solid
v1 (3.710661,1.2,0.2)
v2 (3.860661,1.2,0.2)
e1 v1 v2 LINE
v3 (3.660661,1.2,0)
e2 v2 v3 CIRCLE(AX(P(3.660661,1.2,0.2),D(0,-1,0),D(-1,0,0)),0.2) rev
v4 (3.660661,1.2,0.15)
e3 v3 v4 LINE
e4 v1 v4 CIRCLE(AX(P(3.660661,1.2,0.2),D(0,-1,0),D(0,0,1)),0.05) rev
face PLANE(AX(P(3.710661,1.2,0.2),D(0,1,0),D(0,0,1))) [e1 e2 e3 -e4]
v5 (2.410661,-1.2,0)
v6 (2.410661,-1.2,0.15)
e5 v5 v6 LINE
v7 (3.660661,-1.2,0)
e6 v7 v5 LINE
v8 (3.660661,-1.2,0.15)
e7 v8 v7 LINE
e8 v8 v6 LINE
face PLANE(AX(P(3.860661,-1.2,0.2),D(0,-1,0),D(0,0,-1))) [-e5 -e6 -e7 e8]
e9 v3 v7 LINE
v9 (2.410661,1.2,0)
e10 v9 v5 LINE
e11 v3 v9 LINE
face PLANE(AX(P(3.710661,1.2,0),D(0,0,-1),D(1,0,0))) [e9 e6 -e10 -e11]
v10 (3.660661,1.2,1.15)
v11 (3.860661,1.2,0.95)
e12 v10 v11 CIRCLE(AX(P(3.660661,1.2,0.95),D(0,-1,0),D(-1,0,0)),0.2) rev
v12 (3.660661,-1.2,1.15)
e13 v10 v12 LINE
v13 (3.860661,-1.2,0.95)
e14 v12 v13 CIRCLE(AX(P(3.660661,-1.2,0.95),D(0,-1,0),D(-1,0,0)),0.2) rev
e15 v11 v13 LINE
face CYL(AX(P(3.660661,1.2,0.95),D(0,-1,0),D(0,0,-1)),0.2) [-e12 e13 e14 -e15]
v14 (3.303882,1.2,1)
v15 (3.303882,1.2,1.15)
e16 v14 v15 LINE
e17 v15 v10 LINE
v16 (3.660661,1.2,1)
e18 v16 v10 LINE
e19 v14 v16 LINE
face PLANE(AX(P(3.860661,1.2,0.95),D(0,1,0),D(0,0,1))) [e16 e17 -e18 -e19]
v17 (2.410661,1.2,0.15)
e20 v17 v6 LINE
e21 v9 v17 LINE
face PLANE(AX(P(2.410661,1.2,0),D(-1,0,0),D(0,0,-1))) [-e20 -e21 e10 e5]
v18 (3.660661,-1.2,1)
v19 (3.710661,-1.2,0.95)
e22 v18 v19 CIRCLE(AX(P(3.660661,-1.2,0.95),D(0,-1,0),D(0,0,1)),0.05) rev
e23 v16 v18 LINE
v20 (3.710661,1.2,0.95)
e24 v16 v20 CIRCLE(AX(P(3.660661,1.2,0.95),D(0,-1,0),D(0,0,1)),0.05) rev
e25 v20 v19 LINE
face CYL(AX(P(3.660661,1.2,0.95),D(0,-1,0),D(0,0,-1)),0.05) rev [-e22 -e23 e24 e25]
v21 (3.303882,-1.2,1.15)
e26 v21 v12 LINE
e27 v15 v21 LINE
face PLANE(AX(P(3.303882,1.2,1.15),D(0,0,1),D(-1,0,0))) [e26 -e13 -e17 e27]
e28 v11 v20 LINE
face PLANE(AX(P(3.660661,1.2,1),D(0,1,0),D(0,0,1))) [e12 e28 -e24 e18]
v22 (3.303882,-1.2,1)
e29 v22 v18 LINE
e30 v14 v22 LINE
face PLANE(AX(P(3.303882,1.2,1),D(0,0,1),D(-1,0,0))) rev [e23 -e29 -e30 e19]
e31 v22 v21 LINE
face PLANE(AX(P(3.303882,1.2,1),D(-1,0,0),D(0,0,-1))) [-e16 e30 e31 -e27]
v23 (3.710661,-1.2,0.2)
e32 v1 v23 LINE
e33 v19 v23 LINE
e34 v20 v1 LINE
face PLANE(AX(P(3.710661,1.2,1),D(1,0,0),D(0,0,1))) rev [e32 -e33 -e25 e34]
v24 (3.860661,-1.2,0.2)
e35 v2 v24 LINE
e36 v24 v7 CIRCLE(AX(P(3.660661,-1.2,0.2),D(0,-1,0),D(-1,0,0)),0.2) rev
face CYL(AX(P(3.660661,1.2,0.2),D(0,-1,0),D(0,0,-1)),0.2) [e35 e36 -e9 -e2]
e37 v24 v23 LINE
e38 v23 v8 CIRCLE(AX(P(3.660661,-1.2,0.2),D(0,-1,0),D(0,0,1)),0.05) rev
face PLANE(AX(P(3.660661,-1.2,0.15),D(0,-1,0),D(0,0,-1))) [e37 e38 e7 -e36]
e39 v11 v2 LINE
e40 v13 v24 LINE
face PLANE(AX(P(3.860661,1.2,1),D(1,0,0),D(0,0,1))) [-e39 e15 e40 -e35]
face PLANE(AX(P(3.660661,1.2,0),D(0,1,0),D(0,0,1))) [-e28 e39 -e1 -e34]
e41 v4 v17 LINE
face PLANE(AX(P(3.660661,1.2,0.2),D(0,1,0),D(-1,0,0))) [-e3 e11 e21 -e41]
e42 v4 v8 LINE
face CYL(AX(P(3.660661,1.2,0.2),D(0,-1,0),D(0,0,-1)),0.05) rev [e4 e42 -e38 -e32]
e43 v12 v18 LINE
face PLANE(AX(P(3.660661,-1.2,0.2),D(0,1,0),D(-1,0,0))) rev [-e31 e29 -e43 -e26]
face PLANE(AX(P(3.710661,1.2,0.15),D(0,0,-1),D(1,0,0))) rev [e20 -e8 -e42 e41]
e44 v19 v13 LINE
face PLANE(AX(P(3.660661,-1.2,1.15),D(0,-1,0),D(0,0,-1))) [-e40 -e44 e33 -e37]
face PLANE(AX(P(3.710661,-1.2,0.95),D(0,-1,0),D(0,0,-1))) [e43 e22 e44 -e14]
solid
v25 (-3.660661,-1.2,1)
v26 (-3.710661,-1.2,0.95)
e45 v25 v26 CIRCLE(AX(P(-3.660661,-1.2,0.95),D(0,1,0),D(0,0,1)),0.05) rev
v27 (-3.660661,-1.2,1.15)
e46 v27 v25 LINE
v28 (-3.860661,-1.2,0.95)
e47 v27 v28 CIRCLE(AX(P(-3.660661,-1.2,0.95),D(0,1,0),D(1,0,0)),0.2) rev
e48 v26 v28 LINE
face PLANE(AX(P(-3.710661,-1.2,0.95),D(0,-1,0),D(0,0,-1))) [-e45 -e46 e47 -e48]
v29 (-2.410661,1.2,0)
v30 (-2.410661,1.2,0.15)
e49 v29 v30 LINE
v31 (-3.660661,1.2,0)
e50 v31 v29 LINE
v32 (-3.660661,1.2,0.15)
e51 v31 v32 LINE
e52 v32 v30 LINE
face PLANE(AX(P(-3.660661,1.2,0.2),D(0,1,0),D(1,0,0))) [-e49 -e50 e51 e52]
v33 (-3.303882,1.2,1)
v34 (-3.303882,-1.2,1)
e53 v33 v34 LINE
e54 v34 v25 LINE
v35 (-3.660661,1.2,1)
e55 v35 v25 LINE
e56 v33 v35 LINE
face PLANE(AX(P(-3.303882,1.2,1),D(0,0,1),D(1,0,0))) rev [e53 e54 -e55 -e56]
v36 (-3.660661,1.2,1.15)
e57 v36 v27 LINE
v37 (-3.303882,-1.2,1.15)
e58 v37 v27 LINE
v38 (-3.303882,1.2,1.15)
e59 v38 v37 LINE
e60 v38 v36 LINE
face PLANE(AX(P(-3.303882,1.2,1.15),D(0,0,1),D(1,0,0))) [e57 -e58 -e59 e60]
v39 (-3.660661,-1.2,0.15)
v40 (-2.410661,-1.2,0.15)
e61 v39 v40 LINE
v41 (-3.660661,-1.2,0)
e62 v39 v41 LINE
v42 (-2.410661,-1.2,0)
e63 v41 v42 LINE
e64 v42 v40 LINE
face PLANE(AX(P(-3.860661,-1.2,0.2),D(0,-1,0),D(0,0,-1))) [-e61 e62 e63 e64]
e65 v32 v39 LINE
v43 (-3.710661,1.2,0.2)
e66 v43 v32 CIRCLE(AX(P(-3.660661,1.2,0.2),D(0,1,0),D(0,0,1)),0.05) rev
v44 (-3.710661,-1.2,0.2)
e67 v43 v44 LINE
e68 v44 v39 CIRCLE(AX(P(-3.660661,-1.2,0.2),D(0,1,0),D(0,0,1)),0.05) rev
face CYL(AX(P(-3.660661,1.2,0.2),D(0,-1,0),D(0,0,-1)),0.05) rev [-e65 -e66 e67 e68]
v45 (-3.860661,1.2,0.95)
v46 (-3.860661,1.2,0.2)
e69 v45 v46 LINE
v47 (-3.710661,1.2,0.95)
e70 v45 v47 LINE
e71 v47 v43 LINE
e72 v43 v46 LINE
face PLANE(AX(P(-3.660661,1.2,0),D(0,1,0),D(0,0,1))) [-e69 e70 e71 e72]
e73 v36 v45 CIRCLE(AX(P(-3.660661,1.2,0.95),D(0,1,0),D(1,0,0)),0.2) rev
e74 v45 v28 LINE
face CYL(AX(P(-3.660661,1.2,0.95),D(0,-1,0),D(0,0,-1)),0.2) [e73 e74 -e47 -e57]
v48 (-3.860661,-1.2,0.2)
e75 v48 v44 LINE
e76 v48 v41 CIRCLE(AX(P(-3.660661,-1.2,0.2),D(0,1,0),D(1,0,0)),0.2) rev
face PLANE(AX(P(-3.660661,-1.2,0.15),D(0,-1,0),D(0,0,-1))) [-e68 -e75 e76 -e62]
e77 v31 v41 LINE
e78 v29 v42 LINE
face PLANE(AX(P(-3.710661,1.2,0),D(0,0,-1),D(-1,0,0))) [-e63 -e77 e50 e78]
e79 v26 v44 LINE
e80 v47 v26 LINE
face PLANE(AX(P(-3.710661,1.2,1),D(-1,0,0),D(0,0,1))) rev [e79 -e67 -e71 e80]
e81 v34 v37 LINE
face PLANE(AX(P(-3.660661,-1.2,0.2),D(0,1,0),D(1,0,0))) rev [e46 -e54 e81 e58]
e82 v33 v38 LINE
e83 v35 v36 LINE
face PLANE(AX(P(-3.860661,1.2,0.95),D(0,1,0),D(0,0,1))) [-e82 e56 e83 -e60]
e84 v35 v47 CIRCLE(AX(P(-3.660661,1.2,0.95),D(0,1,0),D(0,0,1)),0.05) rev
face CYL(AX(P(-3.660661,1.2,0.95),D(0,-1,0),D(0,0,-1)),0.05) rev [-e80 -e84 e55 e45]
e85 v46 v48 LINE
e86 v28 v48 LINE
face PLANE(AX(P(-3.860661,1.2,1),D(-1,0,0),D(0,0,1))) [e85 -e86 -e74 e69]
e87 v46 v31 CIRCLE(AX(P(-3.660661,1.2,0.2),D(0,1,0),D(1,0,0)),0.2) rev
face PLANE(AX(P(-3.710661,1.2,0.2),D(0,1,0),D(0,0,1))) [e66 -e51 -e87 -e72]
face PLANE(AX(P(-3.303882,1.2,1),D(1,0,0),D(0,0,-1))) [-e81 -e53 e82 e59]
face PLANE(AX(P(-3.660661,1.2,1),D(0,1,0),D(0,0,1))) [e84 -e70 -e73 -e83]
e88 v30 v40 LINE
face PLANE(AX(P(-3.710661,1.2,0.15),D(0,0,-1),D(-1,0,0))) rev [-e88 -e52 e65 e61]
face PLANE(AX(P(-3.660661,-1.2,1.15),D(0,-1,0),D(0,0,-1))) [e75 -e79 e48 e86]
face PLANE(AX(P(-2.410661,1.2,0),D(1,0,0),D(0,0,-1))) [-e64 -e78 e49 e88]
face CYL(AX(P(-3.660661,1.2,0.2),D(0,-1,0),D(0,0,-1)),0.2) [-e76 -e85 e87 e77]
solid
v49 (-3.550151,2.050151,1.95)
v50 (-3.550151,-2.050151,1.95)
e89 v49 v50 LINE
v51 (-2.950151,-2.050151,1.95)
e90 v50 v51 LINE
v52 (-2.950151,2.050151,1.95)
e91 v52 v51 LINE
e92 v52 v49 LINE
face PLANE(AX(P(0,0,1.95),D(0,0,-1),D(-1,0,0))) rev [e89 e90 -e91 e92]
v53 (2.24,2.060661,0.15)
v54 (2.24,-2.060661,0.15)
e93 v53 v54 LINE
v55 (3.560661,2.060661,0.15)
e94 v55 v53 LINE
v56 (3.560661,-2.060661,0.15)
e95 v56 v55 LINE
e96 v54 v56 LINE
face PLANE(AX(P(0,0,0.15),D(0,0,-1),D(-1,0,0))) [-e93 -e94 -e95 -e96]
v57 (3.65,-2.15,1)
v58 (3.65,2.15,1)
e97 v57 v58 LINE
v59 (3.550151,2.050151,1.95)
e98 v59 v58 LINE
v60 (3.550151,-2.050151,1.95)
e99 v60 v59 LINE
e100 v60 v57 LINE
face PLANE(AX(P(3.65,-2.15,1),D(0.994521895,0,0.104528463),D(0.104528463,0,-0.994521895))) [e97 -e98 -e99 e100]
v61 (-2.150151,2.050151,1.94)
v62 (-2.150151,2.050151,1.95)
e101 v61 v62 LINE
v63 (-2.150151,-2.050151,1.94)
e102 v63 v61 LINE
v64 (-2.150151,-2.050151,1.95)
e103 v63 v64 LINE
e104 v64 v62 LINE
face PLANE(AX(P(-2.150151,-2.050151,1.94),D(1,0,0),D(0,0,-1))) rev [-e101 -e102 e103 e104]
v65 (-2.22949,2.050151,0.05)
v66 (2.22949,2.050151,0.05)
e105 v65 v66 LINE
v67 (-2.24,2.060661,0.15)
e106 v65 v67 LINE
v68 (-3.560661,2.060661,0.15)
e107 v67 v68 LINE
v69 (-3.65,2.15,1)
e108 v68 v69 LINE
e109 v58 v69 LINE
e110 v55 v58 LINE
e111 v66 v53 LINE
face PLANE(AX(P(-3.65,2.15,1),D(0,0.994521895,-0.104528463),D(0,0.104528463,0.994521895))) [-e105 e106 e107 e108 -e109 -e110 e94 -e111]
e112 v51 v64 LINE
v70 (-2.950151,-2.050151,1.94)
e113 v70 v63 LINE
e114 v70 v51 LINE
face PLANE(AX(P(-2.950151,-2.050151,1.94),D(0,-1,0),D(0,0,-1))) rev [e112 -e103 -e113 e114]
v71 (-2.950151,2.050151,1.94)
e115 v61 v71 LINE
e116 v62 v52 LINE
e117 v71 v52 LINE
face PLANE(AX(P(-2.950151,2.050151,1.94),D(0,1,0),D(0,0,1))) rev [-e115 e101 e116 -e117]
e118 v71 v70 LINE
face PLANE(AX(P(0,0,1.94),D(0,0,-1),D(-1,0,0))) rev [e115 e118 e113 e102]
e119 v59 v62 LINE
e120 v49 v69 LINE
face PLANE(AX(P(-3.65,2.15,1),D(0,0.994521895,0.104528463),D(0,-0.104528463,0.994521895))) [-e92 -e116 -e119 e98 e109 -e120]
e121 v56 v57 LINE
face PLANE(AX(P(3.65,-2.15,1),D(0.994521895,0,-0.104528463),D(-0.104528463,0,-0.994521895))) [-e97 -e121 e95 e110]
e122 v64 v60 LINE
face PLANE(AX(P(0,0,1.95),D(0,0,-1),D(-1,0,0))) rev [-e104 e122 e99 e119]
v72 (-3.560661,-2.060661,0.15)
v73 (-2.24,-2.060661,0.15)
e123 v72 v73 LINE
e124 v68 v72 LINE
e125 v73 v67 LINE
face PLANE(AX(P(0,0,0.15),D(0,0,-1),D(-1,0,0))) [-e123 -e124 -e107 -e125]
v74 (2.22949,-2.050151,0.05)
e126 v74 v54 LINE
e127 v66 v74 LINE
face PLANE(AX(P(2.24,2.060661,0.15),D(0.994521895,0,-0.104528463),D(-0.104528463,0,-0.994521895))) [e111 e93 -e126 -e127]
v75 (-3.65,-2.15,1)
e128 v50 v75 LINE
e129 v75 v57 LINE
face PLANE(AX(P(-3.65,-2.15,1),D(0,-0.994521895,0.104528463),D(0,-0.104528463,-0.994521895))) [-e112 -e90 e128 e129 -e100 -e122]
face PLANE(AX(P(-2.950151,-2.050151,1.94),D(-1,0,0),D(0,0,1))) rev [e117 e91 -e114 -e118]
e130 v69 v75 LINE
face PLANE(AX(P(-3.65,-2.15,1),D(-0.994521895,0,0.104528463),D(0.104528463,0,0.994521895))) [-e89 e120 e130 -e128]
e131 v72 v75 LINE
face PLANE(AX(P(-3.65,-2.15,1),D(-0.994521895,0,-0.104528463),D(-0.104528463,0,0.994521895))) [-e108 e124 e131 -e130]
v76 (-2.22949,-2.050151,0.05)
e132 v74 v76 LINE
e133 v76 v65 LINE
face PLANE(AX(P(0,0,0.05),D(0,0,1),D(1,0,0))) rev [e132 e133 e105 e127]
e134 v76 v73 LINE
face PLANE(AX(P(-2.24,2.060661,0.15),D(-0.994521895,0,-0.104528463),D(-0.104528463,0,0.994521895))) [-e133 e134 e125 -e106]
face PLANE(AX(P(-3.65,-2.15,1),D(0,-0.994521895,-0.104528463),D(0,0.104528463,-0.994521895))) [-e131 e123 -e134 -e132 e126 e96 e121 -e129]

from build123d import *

# Parameters (mm, degrees)
SKETCH_1_W                  = 7.3
SKETCH_1_H                  = 4.3
EXTRUDE_1_DEPTH             = 0.95
EXTRUDE_1_TAPER             = 6
EXTRUDE_1_OTHER_WAY_DEPTH   = 0.85
EXTRUDE_1_OTHER_WAY_TAPER   = 6
SM_BASE_FLANGE_1_DEPTH      = 1.2
SM_BASE_FLANGE_1_DEPTH_BACK = 1.2
SKETCH_10_W                 = 4.48
SKETCH_10_H                 = 4.1213228
EXTRUDE_2_DEPTH             = 0.1
EXTRUDE_2_TAPER             = 6
SKETCH_12_W                 = 0.8
SKETCH_12_H                 = 4.100301952
CUT_EXTRUDE_1_DEPTH         = 0.01


# Sheet-metal steps are written as plain solids
with BuildPart() as part:
    # Sketch 1 → Бобышка-Вытянуть1 (new body)
    with BuildSketch(Plane.XY.offset(1)):
        Rectangle(SKETCH_1_W, SKETCH_1_H)
    extrude(amount=EXTRUDE_1_DEPTH, taper=EXTRUDE_1_TAPER)

    # Sketch 1 → Бобышка-Вытянуть1 other way (add)
    with BuildSketch(Plane.XY.offset(1)):
        Rectangle(SKETCH_1_W, SKETCH_1_H)
    extrude(amount=-EXTRUDE_1_OTHER_WAY_DEPTH, taper=EXTRUDE_1_OTHER_WAY_TAPER)

    # Эскиз10 → Бобышка-Вытянуть2 (add)
    with BuildSketch(Plane(origin=(0, 0, 0.15), x_dir=(-1, 0, 0), z_dir=(0, 0, -1))):
        Rectangle(SKETCH_10_W, SKETCH_10_H)
    extrude(amount=EXTRUDE_2_DEPTH, taper=EXTRUDE_2_TAPER)

    # Эскиз12 → Вырез-Вытянуть1 (cut)
    with BuildSketch(Plane.XY.offset(1.95)):
        with Locations((-2.550150976, 0)):
            Rectangle(SKETCH_12_W, SKETCH_12_H)
    extrude(amount=-CUT_EXTRUDE_1_DEPTH, mode=Mode.SUBTRACT)


with BuildPart() as body_2:
    # Sketch 3 → Базовая кромка1 (new, two sides: drawn at the far end of the back side and taken through both)
    with BuildSketch(Plane(origin=(0, 0, 0), x_dir=(1, 0, 0), z_dir=(0, 1, 0)).offset(-SM_BASE_FLANGE_1_DEPTH_BACK)):
        with BuildLine():
            Line((-3.303882397, -1), (-3.6606614, -1))
            ThreePointArc((-3.6606614, -1), (-3.696016739, -0.985355339), (-3.7106614, -0.95))
            Line((-3.7106614, -0.95), (-3.7106614, -0.2))
            ThreePointArc((-3.7106614, -0.2), (-3.696016739, -0.164644661), (-3.6606614, -0.15))
            Line((-3.6606614, -0.15), (-2.4106614, -0.15))
            Line((-2.4106614, -0.15), (-2.4106614, 0))
            Line((-2.4106614, 0), (-3.6606614, 0))
            ThreePointArc((-3.6606614, 0), (-3.802082756, -0.058578644), (-3.8606614, -0.2))
            Line((-3.8606614, -0.2), (-3.8606614, -0.95))
            ThreePointArc((-3.8606614, -0.95), (-3.802082756, -1.091421356), (-3.6606614, -1.15))
            Line((-3.6606614, -1.15), (-3.303882397, -1.15))
            Line((-3.303882397, -1.15), (-3.303882397, -1))
        make_face()
    extrude(amount=SM_BASE_FLANGE_1_DEPTH + SM_BASE_FLANGE_1_DEPTH_BACK)


with BuildPart() as body_3:
    # Зеркальное отражение1: mirrored copy
    add(body_2.part.mirror(Plane(origin=(0, 0, 0), x_dir=(0, 0, 1), z_dir=(1, 0, 0))))


solid = Compound([part.part, body_2.part, body_3.part])
